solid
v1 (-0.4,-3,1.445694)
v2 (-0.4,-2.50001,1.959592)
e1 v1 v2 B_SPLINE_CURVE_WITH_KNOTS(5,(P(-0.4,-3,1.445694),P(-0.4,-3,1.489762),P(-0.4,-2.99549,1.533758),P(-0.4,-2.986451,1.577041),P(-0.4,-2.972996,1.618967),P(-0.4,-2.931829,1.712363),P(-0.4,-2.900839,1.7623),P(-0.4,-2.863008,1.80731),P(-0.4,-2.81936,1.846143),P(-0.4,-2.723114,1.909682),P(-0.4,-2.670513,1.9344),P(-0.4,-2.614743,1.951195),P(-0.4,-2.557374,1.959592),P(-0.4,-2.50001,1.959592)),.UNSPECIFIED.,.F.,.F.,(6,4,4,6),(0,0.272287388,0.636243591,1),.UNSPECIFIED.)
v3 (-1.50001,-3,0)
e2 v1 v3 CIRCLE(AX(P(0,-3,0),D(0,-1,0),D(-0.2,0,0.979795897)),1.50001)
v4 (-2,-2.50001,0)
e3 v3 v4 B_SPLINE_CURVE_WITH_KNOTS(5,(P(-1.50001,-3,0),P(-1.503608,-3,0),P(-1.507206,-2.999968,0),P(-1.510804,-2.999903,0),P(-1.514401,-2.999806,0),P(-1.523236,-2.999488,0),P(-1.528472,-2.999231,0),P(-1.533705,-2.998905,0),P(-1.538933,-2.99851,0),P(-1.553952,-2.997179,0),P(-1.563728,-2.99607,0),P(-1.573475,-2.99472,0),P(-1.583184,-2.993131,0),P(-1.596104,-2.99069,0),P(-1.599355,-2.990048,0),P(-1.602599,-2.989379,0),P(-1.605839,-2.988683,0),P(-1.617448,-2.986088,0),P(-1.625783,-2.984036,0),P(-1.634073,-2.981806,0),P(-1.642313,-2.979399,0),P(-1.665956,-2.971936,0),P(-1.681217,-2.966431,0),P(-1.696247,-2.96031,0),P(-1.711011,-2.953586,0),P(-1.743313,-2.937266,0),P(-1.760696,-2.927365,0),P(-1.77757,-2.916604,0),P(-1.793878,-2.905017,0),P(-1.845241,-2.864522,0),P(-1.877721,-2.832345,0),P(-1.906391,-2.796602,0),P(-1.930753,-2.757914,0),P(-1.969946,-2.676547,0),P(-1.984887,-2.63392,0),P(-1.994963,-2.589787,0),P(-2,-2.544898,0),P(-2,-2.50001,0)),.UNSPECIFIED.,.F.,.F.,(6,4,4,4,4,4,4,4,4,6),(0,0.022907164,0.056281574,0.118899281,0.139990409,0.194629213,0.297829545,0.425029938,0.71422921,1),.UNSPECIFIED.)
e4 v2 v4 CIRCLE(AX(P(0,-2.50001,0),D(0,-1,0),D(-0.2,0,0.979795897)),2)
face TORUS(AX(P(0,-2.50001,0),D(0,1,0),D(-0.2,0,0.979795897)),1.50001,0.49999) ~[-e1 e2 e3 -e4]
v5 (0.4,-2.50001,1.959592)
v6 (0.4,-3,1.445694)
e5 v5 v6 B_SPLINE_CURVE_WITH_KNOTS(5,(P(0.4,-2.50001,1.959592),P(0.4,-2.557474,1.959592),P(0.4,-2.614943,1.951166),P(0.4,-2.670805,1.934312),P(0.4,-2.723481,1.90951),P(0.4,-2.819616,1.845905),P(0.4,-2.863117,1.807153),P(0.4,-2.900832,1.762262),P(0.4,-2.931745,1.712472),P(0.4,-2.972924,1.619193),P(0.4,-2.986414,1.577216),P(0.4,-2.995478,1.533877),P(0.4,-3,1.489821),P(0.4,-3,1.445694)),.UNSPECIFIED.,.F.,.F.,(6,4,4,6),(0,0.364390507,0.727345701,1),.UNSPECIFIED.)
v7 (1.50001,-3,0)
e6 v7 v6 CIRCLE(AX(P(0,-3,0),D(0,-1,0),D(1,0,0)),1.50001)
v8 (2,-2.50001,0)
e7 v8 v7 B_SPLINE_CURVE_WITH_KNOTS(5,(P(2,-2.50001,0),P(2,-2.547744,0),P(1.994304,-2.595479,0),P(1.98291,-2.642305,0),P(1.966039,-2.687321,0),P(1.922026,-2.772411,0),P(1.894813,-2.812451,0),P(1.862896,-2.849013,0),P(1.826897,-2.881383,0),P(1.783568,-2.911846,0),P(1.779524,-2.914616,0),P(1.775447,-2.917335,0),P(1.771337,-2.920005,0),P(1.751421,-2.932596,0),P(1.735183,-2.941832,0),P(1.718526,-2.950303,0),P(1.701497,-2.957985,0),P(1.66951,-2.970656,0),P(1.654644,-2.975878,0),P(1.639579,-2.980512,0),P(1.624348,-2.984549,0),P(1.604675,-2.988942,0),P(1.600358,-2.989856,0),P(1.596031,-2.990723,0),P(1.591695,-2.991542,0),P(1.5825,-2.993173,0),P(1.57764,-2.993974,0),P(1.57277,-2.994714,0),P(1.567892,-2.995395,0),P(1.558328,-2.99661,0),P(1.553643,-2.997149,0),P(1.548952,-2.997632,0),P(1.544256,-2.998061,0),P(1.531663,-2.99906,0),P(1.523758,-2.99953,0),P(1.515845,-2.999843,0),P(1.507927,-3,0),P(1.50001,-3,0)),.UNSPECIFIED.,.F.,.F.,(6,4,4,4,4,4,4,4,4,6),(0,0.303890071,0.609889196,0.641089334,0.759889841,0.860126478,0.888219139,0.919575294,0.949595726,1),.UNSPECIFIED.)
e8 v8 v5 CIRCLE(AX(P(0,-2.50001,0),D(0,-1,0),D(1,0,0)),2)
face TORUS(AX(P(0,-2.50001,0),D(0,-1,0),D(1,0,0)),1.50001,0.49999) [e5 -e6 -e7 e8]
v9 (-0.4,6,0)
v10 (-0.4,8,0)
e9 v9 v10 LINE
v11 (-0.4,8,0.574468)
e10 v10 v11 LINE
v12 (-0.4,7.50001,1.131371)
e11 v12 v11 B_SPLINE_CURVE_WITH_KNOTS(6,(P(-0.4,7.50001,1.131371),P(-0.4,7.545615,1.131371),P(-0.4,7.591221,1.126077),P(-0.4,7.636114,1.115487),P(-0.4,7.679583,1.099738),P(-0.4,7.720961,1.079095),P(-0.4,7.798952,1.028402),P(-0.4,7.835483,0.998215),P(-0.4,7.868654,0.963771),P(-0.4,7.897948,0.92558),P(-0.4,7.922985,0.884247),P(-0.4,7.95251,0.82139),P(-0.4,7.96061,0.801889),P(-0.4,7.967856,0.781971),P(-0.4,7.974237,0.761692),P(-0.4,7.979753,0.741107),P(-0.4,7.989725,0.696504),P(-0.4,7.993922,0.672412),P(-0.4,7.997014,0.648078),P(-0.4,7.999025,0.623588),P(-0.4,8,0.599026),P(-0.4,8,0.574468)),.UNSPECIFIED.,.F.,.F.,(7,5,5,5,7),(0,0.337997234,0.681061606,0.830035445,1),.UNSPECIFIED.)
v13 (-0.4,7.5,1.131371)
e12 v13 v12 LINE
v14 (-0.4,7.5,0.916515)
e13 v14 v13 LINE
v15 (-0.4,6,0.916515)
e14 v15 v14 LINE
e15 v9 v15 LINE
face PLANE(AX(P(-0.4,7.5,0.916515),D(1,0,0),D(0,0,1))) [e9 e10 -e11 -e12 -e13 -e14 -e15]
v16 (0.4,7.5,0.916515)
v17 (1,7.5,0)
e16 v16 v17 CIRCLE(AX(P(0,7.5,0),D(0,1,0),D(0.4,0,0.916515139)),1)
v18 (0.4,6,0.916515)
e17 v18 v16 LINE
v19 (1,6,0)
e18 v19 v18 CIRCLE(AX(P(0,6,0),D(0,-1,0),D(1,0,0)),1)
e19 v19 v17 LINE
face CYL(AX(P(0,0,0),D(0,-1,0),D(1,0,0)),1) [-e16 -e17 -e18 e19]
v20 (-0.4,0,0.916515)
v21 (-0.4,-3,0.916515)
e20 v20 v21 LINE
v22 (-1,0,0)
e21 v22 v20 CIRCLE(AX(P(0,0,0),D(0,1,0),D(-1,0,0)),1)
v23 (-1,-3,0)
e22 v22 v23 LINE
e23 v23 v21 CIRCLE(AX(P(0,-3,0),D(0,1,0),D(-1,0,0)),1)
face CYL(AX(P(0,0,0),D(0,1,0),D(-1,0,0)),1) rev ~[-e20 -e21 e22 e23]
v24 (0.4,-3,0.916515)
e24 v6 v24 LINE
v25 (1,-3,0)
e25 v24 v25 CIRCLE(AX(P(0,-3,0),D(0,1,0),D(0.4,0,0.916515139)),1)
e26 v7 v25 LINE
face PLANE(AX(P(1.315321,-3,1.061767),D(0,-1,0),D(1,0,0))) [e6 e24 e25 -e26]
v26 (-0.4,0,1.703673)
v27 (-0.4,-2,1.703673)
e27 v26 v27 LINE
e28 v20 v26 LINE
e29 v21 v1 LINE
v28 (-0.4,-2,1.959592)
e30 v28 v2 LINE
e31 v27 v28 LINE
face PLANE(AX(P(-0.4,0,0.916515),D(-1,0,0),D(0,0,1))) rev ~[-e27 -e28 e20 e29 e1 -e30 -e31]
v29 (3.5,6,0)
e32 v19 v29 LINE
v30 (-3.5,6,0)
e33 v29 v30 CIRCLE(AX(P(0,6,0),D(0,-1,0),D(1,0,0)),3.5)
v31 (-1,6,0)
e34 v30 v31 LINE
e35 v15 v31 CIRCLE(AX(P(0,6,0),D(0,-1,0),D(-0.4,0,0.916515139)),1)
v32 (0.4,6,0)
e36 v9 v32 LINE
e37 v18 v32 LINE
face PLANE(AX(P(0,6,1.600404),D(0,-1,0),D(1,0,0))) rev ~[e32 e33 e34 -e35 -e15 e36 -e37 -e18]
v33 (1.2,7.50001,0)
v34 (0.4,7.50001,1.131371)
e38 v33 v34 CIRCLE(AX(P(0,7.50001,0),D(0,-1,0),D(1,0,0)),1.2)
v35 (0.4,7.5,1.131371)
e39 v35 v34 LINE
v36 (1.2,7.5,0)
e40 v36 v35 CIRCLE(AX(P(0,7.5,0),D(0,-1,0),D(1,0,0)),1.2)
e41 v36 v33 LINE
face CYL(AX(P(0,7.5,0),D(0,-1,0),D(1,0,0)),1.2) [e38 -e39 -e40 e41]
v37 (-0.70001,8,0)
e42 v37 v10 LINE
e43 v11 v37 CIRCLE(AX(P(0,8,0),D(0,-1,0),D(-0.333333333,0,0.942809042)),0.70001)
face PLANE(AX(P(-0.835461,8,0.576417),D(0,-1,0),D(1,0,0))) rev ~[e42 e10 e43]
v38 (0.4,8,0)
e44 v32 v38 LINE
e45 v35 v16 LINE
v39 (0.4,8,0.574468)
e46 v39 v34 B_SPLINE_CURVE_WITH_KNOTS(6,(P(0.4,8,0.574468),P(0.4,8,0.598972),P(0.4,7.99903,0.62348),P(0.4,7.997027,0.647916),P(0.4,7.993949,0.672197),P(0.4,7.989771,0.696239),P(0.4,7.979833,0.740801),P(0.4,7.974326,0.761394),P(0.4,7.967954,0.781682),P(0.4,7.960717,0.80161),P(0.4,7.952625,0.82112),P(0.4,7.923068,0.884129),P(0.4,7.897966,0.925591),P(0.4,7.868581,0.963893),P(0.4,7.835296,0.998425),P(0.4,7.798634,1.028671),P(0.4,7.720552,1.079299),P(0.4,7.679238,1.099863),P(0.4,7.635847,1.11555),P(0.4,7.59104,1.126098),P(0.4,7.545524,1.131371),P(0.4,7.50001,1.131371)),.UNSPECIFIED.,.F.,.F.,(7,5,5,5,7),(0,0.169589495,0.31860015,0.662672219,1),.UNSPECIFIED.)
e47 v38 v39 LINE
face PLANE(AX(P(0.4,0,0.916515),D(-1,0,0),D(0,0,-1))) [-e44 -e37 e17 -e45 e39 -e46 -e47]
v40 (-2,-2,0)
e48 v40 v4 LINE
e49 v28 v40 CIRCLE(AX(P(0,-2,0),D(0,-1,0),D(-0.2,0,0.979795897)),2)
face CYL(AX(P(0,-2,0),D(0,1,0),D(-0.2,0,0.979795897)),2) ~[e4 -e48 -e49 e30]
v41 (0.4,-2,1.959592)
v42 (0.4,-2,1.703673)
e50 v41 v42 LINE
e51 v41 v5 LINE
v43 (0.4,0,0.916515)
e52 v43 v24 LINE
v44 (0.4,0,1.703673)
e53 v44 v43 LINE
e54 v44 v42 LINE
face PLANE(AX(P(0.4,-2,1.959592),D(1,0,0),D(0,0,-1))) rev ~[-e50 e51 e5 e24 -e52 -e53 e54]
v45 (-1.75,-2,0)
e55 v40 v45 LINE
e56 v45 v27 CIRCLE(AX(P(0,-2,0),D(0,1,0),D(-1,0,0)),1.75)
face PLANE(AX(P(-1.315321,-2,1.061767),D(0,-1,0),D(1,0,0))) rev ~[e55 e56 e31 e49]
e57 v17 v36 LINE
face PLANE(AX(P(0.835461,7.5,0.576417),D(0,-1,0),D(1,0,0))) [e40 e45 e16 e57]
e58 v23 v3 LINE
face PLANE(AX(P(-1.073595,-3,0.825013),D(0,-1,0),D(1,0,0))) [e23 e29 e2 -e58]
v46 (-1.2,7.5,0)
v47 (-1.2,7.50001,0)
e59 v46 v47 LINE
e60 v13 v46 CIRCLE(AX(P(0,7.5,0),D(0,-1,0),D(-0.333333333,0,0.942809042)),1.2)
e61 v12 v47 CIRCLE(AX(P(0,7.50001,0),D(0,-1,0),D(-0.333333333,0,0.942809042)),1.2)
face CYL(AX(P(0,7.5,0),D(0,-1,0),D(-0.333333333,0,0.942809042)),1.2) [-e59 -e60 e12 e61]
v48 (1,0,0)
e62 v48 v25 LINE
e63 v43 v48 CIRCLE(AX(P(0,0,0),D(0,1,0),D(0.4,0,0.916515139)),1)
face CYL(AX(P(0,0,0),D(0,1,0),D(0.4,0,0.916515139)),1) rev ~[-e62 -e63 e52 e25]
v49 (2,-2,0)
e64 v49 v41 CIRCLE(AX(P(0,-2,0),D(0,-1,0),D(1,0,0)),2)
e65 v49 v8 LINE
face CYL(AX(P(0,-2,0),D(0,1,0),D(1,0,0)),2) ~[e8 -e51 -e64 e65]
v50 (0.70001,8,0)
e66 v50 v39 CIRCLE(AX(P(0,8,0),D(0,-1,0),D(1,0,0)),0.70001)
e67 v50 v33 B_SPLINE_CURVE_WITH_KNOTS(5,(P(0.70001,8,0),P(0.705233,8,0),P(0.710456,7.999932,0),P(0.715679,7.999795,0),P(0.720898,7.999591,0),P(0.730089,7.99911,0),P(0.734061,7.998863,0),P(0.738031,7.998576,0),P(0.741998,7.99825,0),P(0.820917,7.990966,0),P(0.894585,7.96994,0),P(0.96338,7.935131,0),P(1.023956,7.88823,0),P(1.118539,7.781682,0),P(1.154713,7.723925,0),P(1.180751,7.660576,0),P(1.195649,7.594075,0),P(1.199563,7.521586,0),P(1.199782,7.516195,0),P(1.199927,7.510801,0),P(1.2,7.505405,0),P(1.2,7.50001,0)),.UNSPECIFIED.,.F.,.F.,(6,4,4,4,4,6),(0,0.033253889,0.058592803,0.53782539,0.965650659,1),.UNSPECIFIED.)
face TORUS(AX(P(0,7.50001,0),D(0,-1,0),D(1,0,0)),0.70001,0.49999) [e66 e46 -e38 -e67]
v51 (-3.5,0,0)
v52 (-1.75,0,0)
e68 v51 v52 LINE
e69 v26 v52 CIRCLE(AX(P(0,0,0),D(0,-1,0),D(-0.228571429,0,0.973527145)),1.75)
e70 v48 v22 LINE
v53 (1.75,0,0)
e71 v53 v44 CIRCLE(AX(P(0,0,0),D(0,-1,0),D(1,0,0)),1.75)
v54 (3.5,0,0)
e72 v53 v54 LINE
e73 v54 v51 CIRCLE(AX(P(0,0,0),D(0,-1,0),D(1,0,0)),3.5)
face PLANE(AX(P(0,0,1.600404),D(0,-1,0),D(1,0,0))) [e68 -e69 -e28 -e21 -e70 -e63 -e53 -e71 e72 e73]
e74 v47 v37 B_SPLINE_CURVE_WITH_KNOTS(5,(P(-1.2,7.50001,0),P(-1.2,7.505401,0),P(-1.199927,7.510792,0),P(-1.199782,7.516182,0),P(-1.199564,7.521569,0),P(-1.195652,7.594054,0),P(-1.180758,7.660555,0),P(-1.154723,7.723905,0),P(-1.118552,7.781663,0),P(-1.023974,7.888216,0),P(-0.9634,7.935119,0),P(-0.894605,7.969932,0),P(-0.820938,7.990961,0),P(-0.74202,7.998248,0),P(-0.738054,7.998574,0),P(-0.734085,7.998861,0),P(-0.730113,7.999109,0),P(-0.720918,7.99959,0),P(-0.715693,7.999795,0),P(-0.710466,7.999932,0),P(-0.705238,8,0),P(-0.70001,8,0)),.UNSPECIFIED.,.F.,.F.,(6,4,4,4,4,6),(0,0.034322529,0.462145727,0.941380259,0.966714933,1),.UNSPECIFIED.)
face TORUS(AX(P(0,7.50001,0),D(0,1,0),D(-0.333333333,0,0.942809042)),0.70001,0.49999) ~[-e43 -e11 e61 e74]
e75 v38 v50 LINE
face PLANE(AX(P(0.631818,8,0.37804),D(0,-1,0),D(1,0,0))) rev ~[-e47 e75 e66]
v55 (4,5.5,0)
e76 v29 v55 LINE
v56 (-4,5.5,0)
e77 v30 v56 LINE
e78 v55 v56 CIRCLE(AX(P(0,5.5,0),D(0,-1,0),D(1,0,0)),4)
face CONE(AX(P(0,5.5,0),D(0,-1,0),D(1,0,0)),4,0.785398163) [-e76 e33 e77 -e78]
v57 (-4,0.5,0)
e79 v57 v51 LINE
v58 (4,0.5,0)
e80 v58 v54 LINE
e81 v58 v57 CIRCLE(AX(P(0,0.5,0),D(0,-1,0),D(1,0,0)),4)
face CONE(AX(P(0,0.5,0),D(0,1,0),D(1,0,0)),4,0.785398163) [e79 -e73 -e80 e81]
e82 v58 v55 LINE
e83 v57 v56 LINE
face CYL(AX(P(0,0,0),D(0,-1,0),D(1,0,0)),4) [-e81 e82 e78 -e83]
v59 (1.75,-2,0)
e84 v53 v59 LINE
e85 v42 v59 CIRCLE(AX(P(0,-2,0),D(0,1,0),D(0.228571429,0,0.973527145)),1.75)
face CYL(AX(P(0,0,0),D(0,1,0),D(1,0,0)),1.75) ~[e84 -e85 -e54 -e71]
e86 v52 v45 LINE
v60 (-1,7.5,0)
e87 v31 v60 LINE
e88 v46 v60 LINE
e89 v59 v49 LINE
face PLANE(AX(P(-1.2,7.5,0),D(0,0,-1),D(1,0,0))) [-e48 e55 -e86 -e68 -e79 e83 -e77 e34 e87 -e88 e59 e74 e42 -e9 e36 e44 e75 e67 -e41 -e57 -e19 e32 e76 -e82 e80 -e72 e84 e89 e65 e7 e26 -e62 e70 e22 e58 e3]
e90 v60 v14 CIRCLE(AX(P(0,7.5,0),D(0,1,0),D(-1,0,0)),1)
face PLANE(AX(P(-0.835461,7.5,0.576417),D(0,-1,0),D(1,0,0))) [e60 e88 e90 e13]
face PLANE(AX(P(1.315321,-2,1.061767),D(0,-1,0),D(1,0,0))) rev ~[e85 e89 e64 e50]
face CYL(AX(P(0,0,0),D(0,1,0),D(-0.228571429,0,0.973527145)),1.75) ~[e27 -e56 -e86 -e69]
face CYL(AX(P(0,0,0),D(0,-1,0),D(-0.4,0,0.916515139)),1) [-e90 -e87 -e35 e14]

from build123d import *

# Parameters (mm, degrees)
F1_DEPTH = 6
F2_DEPTH = 3
F3_START = 2
F3_DEPTH = 1
F4_SIZE  = 0.5
F5_DEPTH = 8
F6_START = -7.5
F6_DEPTH = 0.5
F7_R     = 0.49999


# Not quite as in the source:
# - a fillet or chamfer is up to 0.001 mm smaller than in the source, because OpenCascade refuses the exact size


with BuildPart() as f1:
    # F0 (on Front) → F1 (new body)
    with BuildSketch(Plane.XZ):
        with BuildLine():
            Line((2, 0), (4, 0))
            ThreePointArc((4, 0), (0, 4), (-4, 0))
            Line((-4, 0), (-2, 0))
            ThreePointArc((-2, 0), (-1.5491933385, 1.2649110641), (-0.4, 1.9595917942))
            Line((-0.4, 1.9595917942), (-0.4, 2))
            Line((-0.4, 2), (0, 2))
            Line((0, 2), (0.4, 2))
            Line((0.4, 2), (0.4, 1.9595917942))
            ThreePointArc((0.4, 1.9595917942), (1.5491933385, 1.2649110641), (2, 0))
        make_face()
        with BuildLine():
            Line((1.75, 0), (2, 0))
            ThreePointArc((2, 0), (1.5491933385, 1.2649110641), (0.4, 1.9595917942))
            Line((0.4, 1.9595917942), (0.4, 1.7036725037))
            ThreePointArc((0.4, 1.7036725037), (1.3715866724, 1.086853256), (1.75, 0))
        make_face()
        with BuildLine():
            ThreePointArc((-0.4, 1.9595917942), (-1.5491933385, 1.2649110641), (-2, 0))
            Line((-2, 0), (-1.75, 0))
            ThreePointArc((-1.75, 0), (-1.3715866724, 1.086853256), (-0.4, 1.7036725037))
            Line((-0.4, 1.7036725037), (-0.4, 1.9595917942))
        make_face()
        with BuildLine():
            Line((1.2, 0), (1.75, 0))
            ThreePointArc((1.75, 0), (1.3715866724, 1.086853256), (0.4, 1.7036725037))
            Line((0.4, 1.7036725037), (0.4, 1.1313708499))
            ThreePointArc((0.4, 1.1313708499), (0.9797958971, 0.692820323), (1.2, 0))
        make_face()
        with BuildLine():
            ThreePointArc((0, 2), (0.201017924, 1.989872306), (0.4, 1.9595917942))
            Line((0.4, 1.9595917942), (0.4, 2))
            Line((0.4, 2), (0, 2))
        make_face()
        with BuildLine():
            Line((0.4, 1.7036725037), (0.4, 1.9595917942))
            ThreePointArc((0.4, 1.9595917942), (0.201017924, 1.989872306), (0, 2))
            ThreePointArc((0, 2), (-0.201017924, 1.989872306), (-0.4, 1.9595917942))
            Line((-0.4, 1.9595917942), (-0.4, 1.7036725037))
            ThreePointArc((-0.4, 1.7036725037), (0, 1.75), (0.4, 1.7036725037))
        make_face()
        with BuildLine():
            ThreePointArc((-0.4, 1.7036725037), (-1.3715866724, 1.086853256), (-1.75, 0))
            Line((-1.75, 0), (-1.2, 0))
            ThreePointArc((-1.2, 0), (-0.9797958971, 0.692820323), (-0.4, 1.1313708499))
            Line((-0.4, 1.1313708499), (-0.4, 1.7036725037))
        make_face()
        with BuildLine():
            Line((-0.4, 2), (-0.4, 1.9595917942))
            ThreePointArc((-0.4, 1.9595917942), (-0.201017924, 1.989872306), (0, 2))
            Line((0, 2), (-0.4, 2))
        make_face()
        with BuildLine():
            Line((1, 0), (1.2, 0))
            ThreePointArc((1.2, 0), (0.9797958971, 0.692820323), (0.4, 1.1313708499))
            Line((0.4, 1.1313708499), (0.4, 0.916515139))
            ThreePointArc((0.4, 0.916515139), (0.8366600265, 0.5477225575), (1, 0))
        make_face()
        with BuildLine():
            Line((0.4, 1.1313708499), (0.4, 1.7036725037))
            ThreePointArc((0.4, 1.7036725037), (0, 1.75), (-0.4, 1.7036725037))
            Line((-0.4, 1.7036725037), (-0.4, 1.1313708499))
            ThreePointArc((-0.4, 1.1313708499), (0, 1.2), (0.4, 1.1313708499))
        make_face()
        with BuildLine():
            ThreePointArc((-0.4, 1.1313708499), (-0.9797958971, 0.692820323), (-1.2, 0))
            Line((-1.2, 0), (-1, 0))
            ThreePointArc((-1, 0), (-0.8366600265, 0.5477225575), (-0.4, 0.916515139))
            Line((-0.4, 0.916515139), (-0.4, 1.1313708499))
        make_face()
        with BuildLine():
            Line((0.4, 0), (1, 0))
            ThreePointArc((1, 0), (0.8366600265, 0.5477225575), (0.4, 0.916515139))
            Line((0.4, 0.916515139), (0.4, 0))
        make_face()
        with BuildLine():
            Line((0.4, 0.916515139), (0.4, 1.1313708499))
            ThreePointArc((0.4, 1.1313708499), (0, 1.2), (-0.4, 1.1313708499))
            Line((-0.4, 1.1313708499), (-0.4, 0.916515139))
            ThreePointArc((-0.4, 0.916515139), (0, 1), (0.4, 0.916515139))
        make_face()
        with BuildLine():
            ThreePointArc((-0.4, 0.916515139), (-0.8366600265, 0.5477225575), (-1, 0))
            Line((-1, 0), (-0.4, 0))
            Line((-0.4, 0), (-0.4, 0.916515139))
        make_face()
        with BuildLine():
            Line((-0.4, 0), (0.4, 0))
            Line((0.4, 0), (0.4, 0.916515139))
            ThreePointArc((0.4, 0.916515139), (0, 1), (-0.4, 0.916515139))
            Line((-0.4, 0.916515139), (-0.4, 0))
        make_face()
    extrude(amount=-F1_DEPTH)

    # F0 (on Front) → F2 (join)
    with BuildSketch(Plane.XZ):
        with BuildLine():
            ThreePointArc((-0.4, 1.7036725037), (-1.3715866724, 1.086853256), (-1.75, 0))
            Line((-1.75, 0), (-1.2, 0))
            ThreePointArc((-1.2, 0), (-0.9797958971, 0.692820323), (-0.4, 1.1313708499))
            Line((-0.4, 1.1313708499), (-0.4, 1.7036725037))
        make_face()
        with BuildLine():
            Line((1, 0), (1.2, 0))
            ThreePointArc((1.2, 0), (0.9797958971, 0.692820323), (0.4, 1.1313708499))
            Line((0.4, 1.1313708499), (0.4, 0.916515139))
            ThreePointArc((0.4, 0.916515139), (0.8366600265, 0.5477225575), (1, 0))
        make_face()
        with BuildLine():
            Line((1.2, 0), (1.75, 0))
            ThreePointArc((1.75, 0), (1.3715866724, 1.086853256), (0.4, 1.7036725037))
            Line((0.4, 1.7036725037), (0.4, 1.1313708499))
            ThreePointArc((0.4, 1.1313708499), (0.9797958971, 0.692820323), (1.2, 0))
        make_face()
        with BuildLine():
            ThreePointArc((-0.4, 1.1313708499), (-0.9797958971, 0.692820323), (-1.2, 0))
            Line((-1.2, 0), (-1, 0))
            ThreePointArc((-1, 0), (-0.8366600265, 0.5477225575), (-0.4, 0.916515139))
            Line((-0.4, 0.916515139), (-0.4, 1.1313708499))
        make_face()
    extrude(amount=F2_DEPTH)

    # F0 (on Front) → F3 (join)
    with BuildSketch(Plane.XZ.offset(F3_START)):
        with BuildLine():
            Line((1.75, 0), (2, 0))
            ThreePointArc((2, 0), (1.5491933385, 1.2649110641), (0.4, 1.9595917942))
            Line((0.4, 1.9595917942), (0.4, 1.7036725037))
            ThreePointArc((0.4, 1.7036725037), (1.3715866724, 1.086853256), (1.75, 0))
        make_face()
        with BuildLine():
            ThreePointArc((-0.4, 1.9595917942), (-1.5491933385, 1.2649110641), (-2, 0))
            Line((-2, 0), (-1.75, 0))
            ThreePointArc((-1.75, 0), (-1.3715866724, 1.086853256), (-0.4, 1.7036725037))
            Line((-0.4, 1.7036725037), (-0.4, 1.9595917942))
        make_face()
    extrude(amount=F3_DEPTH)

    # F4
    f4_edges = [f1.edges().sort_by_distance(p)[0] for p in [
        (0, 0, 4),
        (0, 6, 4),
    ]]
    chamfer(f4_edges, length=F4_SIZE)

    # F0 (on Front) → F5 (join)
    with BuildSketch(Plane.XZ):
        with BuildLine():
            Line((0.4, 0), (1, 0))
            ThreePointArc((1, 0), (0.8366600265, 0.5477225575), (0.4, 0.916515139))
            Line((0.4, 0.916515139), (0.4, 0))
        make_face()
        with BuildLine():
            ThreePointArc((-0.4, 0.916515139), (-0.8366600265, 0.5477225575), (-1, 0))
            Line((-1, 0), (-0.4, 0))
            Line((-0.4, 0), (-0.4, 0.916515139))
        make_face()
    extrude(amount=-F5_DEPTH)

    # F0 (on Front) → F6 (join)
    with BuildSketch(Plane.XZ.offset(F6_START)):
        with BuildLine():
            ThreePointArc((-0.4, 1.1313708499), (-0.9797958971, 0.692820323), (-1.2, 0))
            Line((-1.2, 0), (-1, 0))
            ThreePointArc((-1, 0), (-0.8366600265, 0.5477225575), (-0.4, 0.916515139))
            Line((-0.4, 0.916515139), (-0.4, 1.1313708499))
        make_face()
        with BuildLine():
            Line((1, 0), (1.2, 0))
            ThreePointArc((1.2, 0), (0.9797958971, 0.692820323), (0.4, 1.1313708499))
            Line((0.4, 1.1313708499), (0.4, 0.916515139))
            ThreePointArc((0.4, 0.916515139), (0.8366600265, 0.5477225575), (1, 0))
        make_face()
    extrude(amount=-F6_DEPTH)

    # F7 (radius 0.5 in the source; OpenCascade refuses exactly that, so slightly less here)
    f7_edges = [f1.edges().sort_by_distance(p)[0] for p in [
        (0.979796, 8, 0.69282),
        (-0.979796, 8, 0.69282),
        (1.549193, -3, 1.264911),
        (-1.549193, -3, 1.264911),
    ]]
    fillet(f7_edges, radius=F7_R)


solid = f1.part
